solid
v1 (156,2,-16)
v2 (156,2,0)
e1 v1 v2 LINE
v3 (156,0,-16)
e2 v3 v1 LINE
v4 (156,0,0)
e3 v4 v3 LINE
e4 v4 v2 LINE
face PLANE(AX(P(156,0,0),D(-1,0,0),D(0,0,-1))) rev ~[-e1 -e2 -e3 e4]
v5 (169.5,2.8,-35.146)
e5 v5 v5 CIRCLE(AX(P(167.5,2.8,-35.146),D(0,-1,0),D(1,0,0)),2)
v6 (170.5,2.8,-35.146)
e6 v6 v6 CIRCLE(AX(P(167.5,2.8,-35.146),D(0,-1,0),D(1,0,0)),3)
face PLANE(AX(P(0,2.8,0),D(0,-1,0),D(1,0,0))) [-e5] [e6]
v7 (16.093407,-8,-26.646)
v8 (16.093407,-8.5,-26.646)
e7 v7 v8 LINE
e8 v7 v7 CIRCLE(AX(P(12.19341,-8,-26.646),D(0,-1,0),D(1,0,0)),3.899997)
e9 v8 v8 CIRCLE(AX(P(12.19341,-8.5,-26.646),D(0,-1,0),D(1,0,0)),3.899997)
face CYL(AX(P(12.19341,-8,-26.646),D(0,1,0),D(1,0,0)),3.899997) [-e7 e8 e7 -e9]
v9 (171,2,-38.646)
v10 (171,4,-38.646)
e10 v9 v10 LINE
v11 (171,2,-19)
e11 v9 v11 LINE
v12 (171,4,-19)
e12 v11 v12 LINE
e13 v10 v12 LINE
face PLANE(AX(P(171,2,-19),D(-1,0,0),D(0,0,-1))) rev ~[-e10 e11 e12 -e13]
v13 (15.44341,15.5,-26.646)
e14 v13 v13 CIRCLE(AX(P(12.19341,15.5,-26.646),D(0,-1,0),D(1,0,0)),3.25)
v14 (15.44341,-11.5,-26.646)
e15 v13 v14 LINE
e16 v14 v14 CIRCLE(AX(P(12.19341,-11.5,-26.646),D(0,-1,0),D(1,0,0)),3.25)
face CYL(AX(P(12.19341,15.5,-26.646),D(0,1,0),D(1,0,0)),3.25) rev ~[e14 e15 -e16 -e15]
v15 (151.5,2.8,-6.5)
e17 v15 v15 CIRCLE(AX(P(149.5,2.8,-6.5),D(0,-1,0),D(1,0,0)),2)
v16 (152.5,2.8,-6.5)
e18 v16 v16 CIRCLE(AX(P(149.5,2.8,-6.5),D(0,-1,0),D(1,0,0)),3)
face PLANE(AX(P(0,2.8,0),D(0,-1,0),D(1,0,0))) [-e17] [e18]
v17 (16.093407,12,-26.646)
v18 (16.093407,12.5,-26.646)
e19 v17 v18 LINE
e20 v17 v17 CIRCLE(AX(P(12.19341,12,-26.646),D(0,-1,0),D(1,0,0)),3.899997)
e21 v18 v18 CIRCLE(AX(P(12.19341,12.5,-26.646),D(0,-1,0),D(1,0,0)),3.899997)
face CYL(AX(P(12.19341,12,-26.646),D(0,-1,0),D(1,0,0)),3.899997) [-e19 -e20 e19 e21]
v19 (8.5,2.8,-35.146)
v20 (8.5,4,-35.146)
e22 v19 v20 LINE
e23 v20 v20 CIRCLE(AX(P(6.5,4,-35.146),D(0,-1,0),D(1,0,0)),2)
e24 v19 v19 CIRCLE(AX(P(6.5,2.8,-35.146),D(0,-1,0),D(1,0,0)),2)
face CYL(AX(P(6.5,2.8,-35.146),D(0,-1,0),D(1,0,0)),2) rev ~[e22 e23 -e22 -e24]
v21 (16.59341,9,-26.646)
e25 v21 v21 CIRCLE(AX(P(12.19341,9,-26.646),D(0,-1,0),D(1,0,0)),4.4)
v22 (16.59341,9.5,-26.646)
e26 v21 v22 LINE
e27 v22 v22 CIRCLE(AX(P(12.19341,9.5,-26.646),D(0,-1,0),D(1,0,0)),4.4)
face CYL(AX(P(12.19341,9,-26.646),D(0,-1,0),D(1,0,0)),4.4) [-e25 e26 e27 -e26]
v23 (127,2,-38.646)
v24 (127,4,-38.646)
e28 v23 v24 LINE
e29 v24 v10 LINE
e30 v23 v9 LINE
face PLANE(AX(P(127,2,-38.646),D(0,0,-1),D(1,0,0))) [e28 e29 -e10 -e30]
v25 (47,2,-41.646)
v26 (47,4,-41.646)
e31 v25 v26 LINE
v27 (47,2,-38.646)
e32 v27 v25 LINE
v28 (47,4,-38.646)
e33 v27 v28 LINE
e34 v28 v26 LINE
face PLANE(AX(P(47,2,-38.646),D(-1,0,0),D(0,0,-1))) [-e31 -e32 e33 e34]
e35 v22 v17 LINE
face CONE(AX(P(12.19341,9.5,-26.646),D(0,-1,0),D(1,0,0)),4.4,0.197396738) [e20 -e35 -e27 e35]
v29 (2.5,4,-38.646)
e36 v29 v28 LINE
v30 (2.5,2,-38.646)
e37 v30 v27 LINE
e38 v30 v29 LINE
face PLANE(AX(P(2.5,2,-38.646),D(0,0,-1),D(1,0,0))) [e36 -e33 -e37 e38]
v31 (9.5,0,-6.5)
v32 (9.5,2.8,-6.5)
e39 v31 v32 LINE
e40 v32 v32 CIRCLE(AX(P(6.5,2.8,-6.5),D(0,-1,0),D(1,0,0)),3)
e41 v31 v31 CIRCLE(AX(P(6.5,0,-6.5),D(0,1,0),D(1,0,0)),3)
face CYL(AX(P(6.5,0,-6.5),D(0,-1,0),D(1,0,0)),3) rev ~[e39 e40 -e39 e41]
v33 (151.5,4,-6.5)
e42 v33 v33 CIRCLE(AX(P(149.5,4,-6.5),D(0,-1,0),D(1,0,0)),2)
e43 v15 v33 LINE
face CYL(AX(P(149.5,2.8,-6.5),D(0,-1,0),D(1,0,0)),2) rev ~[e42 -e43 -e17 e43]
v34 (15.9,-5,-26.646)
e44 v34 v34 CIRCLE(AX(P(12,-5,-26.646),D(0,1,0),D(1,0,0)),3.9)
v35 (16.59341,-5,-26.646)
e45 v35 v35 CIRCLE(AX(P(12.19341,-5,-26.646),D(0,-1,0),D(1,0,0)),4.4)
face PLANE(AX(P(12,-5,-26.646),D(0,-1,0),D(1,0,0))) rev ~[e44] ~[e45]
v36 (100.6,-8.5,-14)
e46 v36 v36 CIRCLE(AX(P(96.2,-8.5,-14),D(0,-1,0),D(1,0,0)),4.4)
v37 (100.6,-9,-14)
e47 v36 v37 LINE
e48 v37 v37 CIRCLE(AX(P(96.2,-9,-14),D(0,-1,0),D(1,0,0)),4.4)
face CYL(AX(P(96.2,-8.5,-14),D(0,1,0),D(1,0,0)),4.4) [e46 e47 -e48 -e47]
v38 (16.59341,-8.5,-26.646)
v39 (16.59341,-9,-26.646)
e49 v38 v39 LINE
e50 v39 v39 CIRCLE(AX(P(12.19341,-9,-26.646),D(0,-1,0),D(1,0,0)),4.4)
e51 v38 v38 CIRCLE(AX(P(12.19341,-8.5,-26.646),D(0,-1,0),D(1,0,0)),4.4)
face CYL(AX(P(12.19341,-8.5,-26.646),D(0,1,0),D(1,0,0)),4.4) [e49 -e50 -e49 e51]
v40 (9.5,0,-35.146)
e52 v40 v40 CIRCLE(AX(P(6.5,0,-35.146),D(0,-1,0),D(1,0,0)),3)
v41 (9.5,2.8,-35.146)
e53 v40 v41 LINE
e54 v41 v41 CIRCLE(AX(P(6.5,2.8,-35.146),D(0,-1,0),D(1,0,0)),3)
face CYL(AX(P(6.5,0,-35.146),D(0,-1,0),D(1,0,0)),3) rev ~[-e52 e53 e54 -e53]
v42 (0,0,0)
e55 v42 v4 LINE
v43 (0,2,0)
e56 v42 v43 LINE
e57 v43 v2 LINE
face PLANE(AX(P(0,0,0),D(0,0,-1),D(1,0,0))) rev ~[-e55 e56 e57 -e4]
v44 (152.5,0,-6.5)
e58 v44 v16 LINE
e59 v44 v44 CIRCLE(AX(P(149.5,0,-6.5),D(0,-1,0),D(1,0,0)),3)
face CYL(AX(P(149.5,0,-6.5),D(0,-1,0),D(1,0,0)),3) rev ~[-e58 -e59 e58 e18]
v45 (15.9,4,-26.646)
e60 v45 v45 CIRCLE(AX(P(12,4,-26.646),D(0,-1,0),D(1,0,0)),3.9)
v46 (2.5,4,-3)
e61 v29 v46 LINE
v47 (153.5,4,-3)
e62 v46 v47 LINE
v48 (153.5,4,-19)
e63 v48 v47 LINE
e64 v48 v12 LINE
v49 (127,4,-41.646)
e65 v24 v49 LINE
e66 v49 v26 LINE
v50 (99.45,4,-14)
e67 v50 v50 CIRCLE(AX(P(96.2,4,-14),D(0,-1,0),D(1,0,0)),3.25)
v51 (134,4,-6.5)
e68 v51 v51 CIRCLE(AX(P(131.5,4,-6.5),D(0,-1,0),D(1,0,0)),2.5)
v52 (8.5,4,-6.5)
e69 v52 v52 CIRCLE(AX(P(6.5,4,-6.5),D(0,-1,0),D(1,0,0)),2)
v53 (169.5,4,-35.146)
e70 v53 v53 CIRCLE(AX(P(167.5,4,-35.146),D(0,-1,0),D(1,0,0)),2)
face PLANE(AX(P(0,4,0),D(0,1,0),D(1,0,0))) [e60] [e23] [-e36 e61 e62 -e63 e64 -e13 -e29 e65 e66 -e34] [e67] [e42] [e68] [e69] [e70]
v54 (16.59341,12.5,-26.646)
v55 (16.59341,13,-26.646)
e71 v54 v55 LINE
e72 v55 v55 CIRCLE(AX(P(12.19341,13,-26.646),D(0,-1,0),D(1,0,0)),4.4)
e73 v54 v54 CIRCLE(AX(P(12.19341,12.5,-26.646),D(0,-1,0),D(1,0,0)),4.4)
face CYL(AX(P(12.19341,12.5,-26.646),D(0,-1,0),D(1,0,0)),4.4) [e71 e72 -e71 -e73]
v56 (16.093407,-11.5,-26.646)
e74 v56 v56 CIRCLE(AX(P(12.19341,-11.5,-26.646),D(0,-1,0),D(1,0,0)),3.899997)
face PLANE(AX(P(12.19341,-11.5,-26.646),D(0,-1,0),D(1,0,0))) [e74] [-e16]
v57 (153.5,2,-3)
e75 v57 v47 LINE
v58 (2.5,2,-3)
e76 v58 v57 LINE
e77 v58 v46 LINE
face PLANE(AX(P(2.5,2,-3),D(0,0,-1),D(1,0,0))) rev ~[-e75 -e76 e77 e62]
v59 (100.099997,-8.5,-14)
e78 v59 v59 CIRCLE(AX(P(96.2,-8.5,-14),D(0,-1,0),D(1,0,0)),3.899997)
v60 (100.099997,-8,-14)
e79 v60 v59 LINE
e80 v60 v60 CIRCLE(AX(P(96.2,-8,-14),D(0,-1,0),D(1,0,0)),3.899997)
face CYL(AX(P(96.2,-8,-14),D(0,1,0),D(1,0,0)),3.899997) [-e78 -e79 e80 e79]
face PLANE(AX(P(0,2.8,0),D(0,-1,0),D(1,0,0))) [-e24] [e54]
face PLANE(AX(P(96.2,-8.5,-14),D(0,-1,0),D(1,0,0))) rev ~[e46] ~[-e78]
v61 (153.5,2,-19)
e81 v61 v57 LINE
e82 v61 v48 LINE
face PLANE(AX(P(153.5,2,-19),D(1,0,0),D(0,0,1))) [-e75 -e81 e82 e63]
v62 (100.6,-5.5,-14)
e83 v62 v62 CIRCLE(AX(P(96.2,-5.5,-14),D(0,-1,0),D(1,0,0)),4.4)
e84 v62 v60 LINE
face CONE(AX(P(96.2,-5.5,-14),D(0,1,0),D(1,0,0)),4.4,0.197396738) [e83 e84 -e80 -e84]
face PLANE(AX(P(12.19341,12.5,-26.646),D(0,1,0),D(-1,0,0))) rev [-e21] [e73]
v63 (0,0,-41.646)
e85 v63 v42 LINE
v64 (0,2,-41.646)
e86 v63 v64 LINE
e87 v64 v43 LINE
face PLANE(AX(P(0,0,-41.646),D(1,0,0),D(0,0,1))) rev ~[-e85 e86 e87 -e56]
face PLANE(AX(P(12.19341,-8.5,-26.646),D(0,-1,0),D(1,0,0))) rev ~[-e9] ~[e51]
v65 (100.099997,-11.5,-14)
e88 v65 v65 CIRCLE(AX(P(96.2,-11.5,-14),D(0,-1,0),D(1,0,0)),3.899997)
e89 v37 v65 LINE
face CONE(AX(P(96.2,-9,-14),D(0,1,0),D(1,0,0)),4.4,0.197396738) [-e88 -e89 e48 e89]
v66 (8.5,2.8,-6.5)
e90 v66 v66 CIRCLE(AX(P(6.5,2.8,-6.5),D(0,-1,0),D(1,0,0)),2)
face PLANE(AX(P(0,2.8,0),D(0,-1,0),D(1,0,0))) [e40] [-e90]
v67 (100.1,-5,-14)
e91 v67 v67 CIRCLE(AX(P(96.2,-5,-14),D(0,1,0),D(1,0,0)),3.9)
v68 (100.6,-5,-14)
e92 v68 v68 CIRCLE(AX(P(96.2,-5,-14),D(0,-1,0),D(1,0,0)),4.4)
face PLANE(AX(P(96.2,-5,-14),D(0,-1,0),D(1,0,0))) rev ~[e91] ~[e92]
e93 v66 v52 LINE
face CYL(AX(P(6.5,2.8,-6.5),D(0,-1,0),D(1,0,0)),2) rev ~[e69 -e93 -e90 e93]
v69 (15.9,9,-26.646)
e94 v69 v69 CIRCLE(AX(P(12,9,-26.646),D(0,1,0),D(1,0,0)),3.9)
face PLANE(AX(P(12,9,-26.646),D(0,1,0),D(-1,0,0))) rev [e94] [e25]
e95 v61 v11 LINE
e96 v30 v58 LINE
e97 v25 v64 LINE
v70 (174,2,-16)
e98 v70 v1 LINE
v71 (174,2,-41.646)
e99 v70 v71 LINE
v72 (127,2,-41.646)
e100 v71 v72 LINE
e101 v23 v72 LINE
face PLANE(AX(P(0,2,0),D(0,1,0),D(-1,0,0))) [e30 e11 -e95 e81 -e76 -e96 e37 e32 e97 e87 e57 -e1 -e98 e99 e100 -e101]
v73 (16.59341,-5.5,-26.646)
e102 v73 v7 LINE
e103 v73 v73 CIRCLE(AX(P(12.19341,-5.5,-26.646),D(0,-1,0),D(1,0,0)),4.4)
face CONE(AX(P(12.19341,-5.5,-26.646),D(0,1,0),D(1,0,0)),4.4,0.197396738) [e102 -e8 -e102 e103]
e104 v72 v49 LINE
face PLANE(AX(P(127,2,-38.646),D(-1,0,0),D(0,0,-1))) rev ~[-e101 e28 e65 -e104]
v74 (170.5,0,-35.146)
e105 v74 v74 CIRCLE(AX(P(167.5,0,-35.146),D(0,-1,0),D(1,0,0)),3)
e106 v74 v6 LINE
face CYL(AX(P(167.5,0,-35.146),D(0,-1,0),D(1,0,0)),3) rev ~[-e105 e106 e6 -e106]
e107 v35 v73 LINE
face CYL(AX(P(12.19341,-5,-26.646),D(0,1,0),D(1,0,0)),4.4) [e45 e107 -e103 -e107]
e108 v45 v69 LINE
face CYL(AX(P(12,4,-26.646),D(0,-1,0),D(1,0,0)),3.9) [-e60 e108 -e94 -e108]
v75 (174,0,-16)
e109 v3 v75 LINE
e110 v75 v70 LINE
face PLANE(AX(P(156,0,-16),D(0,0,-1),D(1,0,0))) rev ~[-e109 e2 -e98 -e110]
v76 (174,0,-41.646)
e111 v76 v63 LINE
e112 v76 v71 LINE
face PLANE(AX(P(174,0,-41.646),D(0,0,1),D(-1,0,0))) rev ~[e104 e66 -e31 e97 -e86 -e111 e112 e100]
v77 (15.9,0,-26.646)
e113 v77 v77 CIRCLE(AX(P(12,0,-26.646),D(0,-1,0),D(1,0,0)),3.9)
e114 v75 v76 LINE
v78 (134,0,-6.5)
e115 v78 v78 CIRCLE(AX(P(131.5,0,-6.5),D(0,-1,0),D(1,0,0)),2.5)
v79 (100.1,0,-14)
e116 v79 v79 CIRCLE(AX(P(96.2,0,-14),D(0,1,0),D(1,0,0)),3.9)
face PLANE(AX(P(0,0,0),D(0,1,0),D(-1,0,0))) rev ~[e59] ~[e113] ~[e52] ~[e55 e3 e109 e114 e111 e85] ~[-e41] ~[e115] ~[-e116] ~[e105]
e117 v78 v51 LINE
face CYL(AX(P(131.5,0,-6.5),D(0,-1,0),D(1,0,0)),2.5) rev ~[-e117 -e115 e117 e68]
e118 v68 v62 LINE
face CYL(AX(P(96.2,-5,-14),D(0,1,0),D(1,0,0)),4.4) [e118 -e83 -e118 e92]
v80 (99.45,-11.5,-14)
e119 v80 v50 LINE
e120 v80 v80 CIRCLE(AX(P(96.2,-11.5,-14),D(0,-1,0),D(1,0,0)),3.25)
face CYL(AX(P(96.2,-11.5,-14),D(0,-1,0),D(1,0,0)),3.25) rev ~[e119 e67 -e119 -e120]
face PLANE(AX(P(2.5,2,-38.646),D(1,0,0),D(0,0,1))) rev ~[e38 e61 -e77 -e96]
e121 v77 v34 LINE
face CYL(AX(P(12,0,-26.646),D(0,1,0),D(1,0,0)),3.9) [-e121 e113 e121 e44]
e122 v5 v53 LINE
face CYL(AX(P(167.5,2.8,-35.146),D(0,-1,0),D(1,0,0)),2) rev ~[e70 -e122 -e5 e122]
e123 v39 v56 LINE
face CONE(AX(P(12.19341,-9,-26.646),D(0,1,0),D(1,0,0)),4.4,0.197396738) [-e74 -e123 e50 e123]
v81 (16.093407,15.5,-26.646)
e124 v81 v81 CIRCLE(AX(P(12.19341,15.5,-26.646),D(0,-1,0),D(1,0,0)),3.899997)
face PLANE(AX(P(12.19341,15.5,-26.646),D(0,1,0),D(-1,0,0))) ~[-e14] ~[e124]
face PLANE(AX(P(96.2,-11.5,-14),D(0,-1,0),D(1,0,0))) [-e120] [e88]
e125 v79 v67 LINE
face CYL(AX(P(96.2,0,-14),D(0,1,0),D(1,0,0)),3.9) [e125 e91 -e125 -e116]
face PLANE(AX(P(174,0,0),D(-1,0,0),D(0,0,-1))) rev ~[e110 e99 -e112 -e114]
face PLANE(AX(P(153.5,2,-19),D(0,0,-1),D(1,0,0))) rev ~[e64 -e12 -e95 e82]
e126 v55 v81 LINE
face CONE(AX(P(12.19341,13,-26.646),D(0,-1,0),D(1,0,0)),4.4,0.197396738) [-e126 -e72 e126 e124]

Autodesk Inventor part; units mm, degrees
sketch "Szkic1" plane through (0, 0, 0) normal (0, 1, 0) x (-1, 0, 0)
  line L0 (0, 0) -> (-174, 0)
  line L1 (-174, 0) -> (-174, -41.646)
  line L2 (-174, -41.646) -> (0, -41.646)
  line L3 (0, -41.646) -> (0, 0)
  dimension "d0" = 174
  dimension "d1" = 41.646
extrude "Wyciągnięcie proste1" add sketch "Szkic1" along normal blind 2
sketch "Szkic2" plane through (0, 2, 0) normal (0, 1, 0) x (1, 0, 0)
  line L0 (174, 41.646) -> (0, 41.646) projected
  line L1 (174, 0) -> (174, 41.646) projected
  line L2 (174, 41.646) -> (0, 41.646) projected
  line L3 (0, 41.646) -> (0, 0) projected
  line L4 (0, 0) -> (174, 0) projected
  line L5 (171, 23) -> (171, 38.646)
  line L6 (2.5, 38.646) -> (2.5, 3)
  line L7 (2.5, 3) -> (153.5, 3)
  line L8 (2.5, 41.646) -> (2.5, 38.646)
  line L9 (127, 41.646) -> (47, 41.646)
  line L10 (153.5, 19) -> (171, 19)
  line L11 (171, 19) -> (171, 23)
  line L12 (153.5, 19) -> (153.5, 3)
  line L13 (127, 38.646) -> (127, 41.646)
  line L14 (2.5, 38.646) -> (47, 38.646)
  line L15 (127, 38.646) -> (171, 38.646)
  line L16 (47, 38.646) -> (47, 41.646)
  dimension "d4" = 3
  dimension "d122" = 17.5
  dimension "d123" = 16
  dimension "d150" = 3
  dimension "d151" = 44.5
extrude "Wyciągnięcie proste2" add sketch "Szkic2" along normal blind 2 contours L13 L15 L5 L11 L10 L12 L7 L6 L14 L16 L0
sketch "Szkic21" plane through (0, 0, 0) normal (0, -1, 0) x (1, 0, 0)
  line L0 (0, -41.646) -> (0, 0) projected
  line L1 (0, -41.646) -> (0, 0) projected
  line L2 (0, -26.646) -> (12, -26.646)
  line L3 (174, -41.646) -> (0, -41.646) projected
  line L4 (12, -41.646) -> (12, -26.646)
  circle A0 centre (12, -26.646) radius 3.9
  dimension "d90" = 12
  dimension "d91" = 15
  dimension "d92" = 7.8
extrude "Wyciągnięcie proste20" add sketch "Szkic21" along normal blind 5 contours A0 L4 L2 | L2 L4 A0
sketch "Szkic22" plane through (12, -5, -26.646) normal (0, -1, 0) x (1, 0, 0)
  circle A0 centre (0, 0) radius 3.9
  circle A1 centre (0.19341, 0) radius 4.4
  point P0 (-12, 26.646)
  dimension "d95" = 8.8
extrude "Wyciągnięcie proste21" add sketch "Szkic22" along normal blind 0.5 contours A0 | A1
ref_plane "Płaszczyzna konstrukcyjna1" through (12.19341, -5.5, -26.646) normal (0, -1, 0) x (1, 0, 0)
sketch "Szkic23" plane through (12.19341, -5.5, -26.646) normal (0, -1, 0) x (1, 0, 0)
  circle A0 centre (0, 0) radius 4.4 projected
  circle A1 centre (0, 0) radius 4.4
  point P0 (-12.19341, 26.646)
extrude "Wyciągnięcie proste22" add sketch "Szkic23" along normal blind 2.5 draft -11.31
sketch "Szkic24" plane through (12.19341, -8, -26.646) normal (0, -1, 0) x (1, 0, 0)
  circle A0 centre (0, 0) radius 3.899997
  circle A1 centre (0, 0) radius 3.899997
  point P0 (-12.19341, 26.646)
extrude "Wyciągnięcie proste23" add sketch "Szkic24" along normal blind 0.5
sketch "Szkic25" plane through (12.19341, -8.5, -26.646) normal (0, -1, 0) x (1, 0, 0)
  circle A0 centre (0, 0) radius 4.4 projected
  circle A1 centre (0, 0) radius 4.4
  point P0 (-12.19341, 26.646)
extrude "Wyciągnięcie proste24" add sketch "Szkic25" along normal blind 0.5
ref_plane "Płaszczyzna konstrukcyjna2" through (12.19341, -9, -26.646) normal (0, -1, 0) x (1, 0, 0)
sketch "Szkic26" plane through (12.19341, -9, -26.646) normal (0, -1, 0) x (1, 0, 0)
  circle A0 centre (0, 0) radius 4.4 projected
  circle A1 centre (0, 0) radius 4.4
  point P0 (-12.19341, 26.646)
extrude "Wyciągnięcie proste25" add sketch "Szkic26" along normal blind 2.5 draft -11.31
sketch "Szkic27" plane through (12.19341, -11.5, -26.646) normal (0, -1, 0) x (1, 0, 0)
  circle A0 centre (0, 0) radius 3.899997
  circle A1 centre (0, 0) radius 3.25
  point P0 (-12.19341, 26.646)
  dimension "d108" = 6.5
extrude "Wyciągnięcie proste26" cut sketch "Szkic27" against normal blind 32 contours A1
mirror "Odbij1" about plane through (87, 2, -20.823) normal (0, 1, 0) of "Wyciągnięcie proste20", "Wyciągnięcie proste21", "Wyciągnięcie proste22", "Wyciągnięcie proste24", "Wyciągnięcie proste25", "Wyciągnięcie proste26", "Wyciągnięcie proste23"
sketch "Szkic28" plane through (0, 0, 0) normal (0, -1, 0) x (1, 0, 0)
  line L0 (174, 0) -> (174, -41.646) projected
  line L1 (174, 0) -> (156, 0)
  line L2 (156, 0) -> (156, -16)
  line L3 (156, -16) -> (174, -16)
  line L4 (174, -16) -> (174, 0)
  point P0 (0, 0)
  dimension "d111" = 18
  dimension "d112" = 16
extrude "Wyciągnięcie proste27" cut sketch "Szkic28" against normal blind 4
sketch "Szkic29" plane through (0, 0, 0) normal (0, -1, 0) x (1, 0, 0)
  line L0 (0, 0) -> (156, 0) projected
  line L1 (0, 0) -> (96.2, 0)
  line L2 (96.2, 0) -> (96.2, -14)
  circle A0 centre (96.2, -14) radius 3.9
  dimension "d124" = 96.2
  dimension "d125" = 14
  dimension "d126" = 7.8
extrude "Wyciągnięcie proste28" add sketch "Szkic29" along normal blind 5
sketch "Szkic30" plane through (96.2, -5, -14) normal (0, -1, 0) x (1, 0, 0)
  circle A0 centre (0, 0) radius 3.9 projected
  circle A1 centre (0, 0) radius 4.4
  point P0 (-96.2, 14)
  dimension "d129" = 8.8
extrude "Wyciągnięcie proste29" add sketch "Szkic30" along normal blind 0.5 contours A0 | A1
ref_plane "Płaszczyzna konstrukcyjna3" through (96.2, -5.5, -14) normal (0, -1, 0) x (1, 0, 0)
sketch "Szkic31" plane through (96.2, -5.5, -14) normal (0, -1, 0) x (1, 0, 0)
  circle A0 centre (0, 0) radius 4.4 projected
  circle A1 centre (0, 0) radius 4.4
  point P0 (-96.2, 14)
extrude "Wyciągnięcie proste30" add sketch "Szkic31" along normal blind 2.5 draft -11.31
sketch "Szkic32" plane through (96.2, -8, -14) normal (0, -1, 0) x (1, 0, 0)
  circle A0 centre (0, 0) radius 3.899997
  point P0 (-96.2, 14)
extrude "Wyciągnięcie proste31" add sketch "Szkic32" along normal blind 0.5
sketch "Szkic33" plane through (96.2, -8.5, -14) normal (0, -1, 0) x (1, 0, 0)
  circle A0 centre (0, 0) radius 4.4 projected
  circle A1 centre (0, 0) radius 4.4
  point P0 (-96.2, 14)
extrude "Wyciągnięcie proste32" add sketch "Szkic33" along normal blind 0.5
ref_plane "Płaszczyzna konstrukcyjna4" through (96.2, -9, -14) normal (0, -1, 0) x (1, 0, 0)
sketch "Szkic34" plane through (96.2, -9, -14) normal (0, -1, 0) x (1, 0, 0)
  circle A0 centre (0, 0) radius 3.9 projected
  circle A1 centre (0, 0) radius 4.4
  point P0 (-96.2, 14)
sketch "Szkic34 outline for Wyciągnięcie proste33" plane through (96.2, -9, -14) normal (0, -1, 0) x (1, 0, 0)
  circle A0 centre (0, 0) radius 4.4
extrude "Wyciągnięcie proste33" add sketch "Szkic34 outline for Wyciągnięcie proste33" along normal blind 2.5 draft -11.31
sketch "Szkic35" plane through (96.2, -11.5, -14) normal (0, -1, 0) x (1, 0, 0)
  circle A0 centre (0, 0) radius 3.25
  point P0 (-96.2, 14)
  dimension "d142" = 6.5
extrude "Wyciągnięcie proste34" cut sketch "Szkic35" against normal blind 16
sketch "Szkic37" plane through (0, 0, 0) normal (0, -1, 0) x (1, 0, 0)
  line L0 (0, 0) -> (156, 0)
  line L1 (2.5, -3) -> (153.5, -3)
  line L2 (0, -6.5) -> (6.5, -6.5)
  line L3 (6.5, 0) -> (6.5, -6.5)
  line L4 (0, -41.646) -> (0, 0)
  circle A0 centre (6.5, -6.5) radius 3
  line L5 (0, -20.823) -> (4.213625, -20.823)
  circle A1 centre (6.5, -35.146) radius 3
  line L6 (174, -41.646) -> (0, -41.646)
  line L7 (87, -41.646) -> (87, -34.846)
  circle A2 centre (167.5, -35.146) radius 3
  line L8 (2.5, -3) -> (78, -3)
  line L9 (78, -3) -> (78, -5.430935)
  circle A3 centre (149.5, -6.5) radius 3
  dimension "d156" = 6.5
  dimension "d160" = 6.5
  dimension "d161" = 6
extrude "Wyciągnięcie proste37" cut sketch "Szkic37" against normal blind 2.8 contours A0 L3 L2 | L2 L3 A0 | A1 | A2 | A3
sketch "Szkic38" plane through (6.5, 2.8, -6.5) normal (0, -1, 0) x (1, 0, 0)
  circle A0 centre (0, 0) radius 2
  line L0 (-6.5, -35.146) -> (-6.5, 6.5) projected
  line L1 (-6.5, -14.323) -> (-2.3, -14.323)
  circle A1 centre (0, -28.646) radius 2
  line L2 (167.5, -35.146) -> (-6.5, -35.146) projected
  line L3 (80.5, -35.146) -> (80.5, -30.046)
  circle A2 centre (161, -28.646) radius 2
  line L4 (-4, 3.5) -> (147, 3.5) projected
  line L5 (-4, 3.5) -> (71.5, 3.5)
  line L6 (71.5, 3.5) -> (71.5, -1.9)
  circle A3 centre (143, 0) radius 2
  dimension "d164" = 4
extrude "Wyciągnięcie proste38" cut sketch "Szkic38" against normal blind 3
sketch "Szkic39" plane through (0, 0, 0) normal (0, -1, 0) x (1, 0, 0)
  circle A0 centre (149.5, -6.5) radius 3 projected
  line L0 (146.5, -6.5) -> (131.5, -6.5)
  circle A1 centre (131.5, -6.5) radius 2.5
  point P0 (0, 0)
  dimension "d167" = 15
  dimension "d168" = 5
extrude "Wyciągnięcie proste39" cut sketch "Szkic39" against normal blind 10 contours A1
properties part number "Klapa_Drukowanie 3D"
